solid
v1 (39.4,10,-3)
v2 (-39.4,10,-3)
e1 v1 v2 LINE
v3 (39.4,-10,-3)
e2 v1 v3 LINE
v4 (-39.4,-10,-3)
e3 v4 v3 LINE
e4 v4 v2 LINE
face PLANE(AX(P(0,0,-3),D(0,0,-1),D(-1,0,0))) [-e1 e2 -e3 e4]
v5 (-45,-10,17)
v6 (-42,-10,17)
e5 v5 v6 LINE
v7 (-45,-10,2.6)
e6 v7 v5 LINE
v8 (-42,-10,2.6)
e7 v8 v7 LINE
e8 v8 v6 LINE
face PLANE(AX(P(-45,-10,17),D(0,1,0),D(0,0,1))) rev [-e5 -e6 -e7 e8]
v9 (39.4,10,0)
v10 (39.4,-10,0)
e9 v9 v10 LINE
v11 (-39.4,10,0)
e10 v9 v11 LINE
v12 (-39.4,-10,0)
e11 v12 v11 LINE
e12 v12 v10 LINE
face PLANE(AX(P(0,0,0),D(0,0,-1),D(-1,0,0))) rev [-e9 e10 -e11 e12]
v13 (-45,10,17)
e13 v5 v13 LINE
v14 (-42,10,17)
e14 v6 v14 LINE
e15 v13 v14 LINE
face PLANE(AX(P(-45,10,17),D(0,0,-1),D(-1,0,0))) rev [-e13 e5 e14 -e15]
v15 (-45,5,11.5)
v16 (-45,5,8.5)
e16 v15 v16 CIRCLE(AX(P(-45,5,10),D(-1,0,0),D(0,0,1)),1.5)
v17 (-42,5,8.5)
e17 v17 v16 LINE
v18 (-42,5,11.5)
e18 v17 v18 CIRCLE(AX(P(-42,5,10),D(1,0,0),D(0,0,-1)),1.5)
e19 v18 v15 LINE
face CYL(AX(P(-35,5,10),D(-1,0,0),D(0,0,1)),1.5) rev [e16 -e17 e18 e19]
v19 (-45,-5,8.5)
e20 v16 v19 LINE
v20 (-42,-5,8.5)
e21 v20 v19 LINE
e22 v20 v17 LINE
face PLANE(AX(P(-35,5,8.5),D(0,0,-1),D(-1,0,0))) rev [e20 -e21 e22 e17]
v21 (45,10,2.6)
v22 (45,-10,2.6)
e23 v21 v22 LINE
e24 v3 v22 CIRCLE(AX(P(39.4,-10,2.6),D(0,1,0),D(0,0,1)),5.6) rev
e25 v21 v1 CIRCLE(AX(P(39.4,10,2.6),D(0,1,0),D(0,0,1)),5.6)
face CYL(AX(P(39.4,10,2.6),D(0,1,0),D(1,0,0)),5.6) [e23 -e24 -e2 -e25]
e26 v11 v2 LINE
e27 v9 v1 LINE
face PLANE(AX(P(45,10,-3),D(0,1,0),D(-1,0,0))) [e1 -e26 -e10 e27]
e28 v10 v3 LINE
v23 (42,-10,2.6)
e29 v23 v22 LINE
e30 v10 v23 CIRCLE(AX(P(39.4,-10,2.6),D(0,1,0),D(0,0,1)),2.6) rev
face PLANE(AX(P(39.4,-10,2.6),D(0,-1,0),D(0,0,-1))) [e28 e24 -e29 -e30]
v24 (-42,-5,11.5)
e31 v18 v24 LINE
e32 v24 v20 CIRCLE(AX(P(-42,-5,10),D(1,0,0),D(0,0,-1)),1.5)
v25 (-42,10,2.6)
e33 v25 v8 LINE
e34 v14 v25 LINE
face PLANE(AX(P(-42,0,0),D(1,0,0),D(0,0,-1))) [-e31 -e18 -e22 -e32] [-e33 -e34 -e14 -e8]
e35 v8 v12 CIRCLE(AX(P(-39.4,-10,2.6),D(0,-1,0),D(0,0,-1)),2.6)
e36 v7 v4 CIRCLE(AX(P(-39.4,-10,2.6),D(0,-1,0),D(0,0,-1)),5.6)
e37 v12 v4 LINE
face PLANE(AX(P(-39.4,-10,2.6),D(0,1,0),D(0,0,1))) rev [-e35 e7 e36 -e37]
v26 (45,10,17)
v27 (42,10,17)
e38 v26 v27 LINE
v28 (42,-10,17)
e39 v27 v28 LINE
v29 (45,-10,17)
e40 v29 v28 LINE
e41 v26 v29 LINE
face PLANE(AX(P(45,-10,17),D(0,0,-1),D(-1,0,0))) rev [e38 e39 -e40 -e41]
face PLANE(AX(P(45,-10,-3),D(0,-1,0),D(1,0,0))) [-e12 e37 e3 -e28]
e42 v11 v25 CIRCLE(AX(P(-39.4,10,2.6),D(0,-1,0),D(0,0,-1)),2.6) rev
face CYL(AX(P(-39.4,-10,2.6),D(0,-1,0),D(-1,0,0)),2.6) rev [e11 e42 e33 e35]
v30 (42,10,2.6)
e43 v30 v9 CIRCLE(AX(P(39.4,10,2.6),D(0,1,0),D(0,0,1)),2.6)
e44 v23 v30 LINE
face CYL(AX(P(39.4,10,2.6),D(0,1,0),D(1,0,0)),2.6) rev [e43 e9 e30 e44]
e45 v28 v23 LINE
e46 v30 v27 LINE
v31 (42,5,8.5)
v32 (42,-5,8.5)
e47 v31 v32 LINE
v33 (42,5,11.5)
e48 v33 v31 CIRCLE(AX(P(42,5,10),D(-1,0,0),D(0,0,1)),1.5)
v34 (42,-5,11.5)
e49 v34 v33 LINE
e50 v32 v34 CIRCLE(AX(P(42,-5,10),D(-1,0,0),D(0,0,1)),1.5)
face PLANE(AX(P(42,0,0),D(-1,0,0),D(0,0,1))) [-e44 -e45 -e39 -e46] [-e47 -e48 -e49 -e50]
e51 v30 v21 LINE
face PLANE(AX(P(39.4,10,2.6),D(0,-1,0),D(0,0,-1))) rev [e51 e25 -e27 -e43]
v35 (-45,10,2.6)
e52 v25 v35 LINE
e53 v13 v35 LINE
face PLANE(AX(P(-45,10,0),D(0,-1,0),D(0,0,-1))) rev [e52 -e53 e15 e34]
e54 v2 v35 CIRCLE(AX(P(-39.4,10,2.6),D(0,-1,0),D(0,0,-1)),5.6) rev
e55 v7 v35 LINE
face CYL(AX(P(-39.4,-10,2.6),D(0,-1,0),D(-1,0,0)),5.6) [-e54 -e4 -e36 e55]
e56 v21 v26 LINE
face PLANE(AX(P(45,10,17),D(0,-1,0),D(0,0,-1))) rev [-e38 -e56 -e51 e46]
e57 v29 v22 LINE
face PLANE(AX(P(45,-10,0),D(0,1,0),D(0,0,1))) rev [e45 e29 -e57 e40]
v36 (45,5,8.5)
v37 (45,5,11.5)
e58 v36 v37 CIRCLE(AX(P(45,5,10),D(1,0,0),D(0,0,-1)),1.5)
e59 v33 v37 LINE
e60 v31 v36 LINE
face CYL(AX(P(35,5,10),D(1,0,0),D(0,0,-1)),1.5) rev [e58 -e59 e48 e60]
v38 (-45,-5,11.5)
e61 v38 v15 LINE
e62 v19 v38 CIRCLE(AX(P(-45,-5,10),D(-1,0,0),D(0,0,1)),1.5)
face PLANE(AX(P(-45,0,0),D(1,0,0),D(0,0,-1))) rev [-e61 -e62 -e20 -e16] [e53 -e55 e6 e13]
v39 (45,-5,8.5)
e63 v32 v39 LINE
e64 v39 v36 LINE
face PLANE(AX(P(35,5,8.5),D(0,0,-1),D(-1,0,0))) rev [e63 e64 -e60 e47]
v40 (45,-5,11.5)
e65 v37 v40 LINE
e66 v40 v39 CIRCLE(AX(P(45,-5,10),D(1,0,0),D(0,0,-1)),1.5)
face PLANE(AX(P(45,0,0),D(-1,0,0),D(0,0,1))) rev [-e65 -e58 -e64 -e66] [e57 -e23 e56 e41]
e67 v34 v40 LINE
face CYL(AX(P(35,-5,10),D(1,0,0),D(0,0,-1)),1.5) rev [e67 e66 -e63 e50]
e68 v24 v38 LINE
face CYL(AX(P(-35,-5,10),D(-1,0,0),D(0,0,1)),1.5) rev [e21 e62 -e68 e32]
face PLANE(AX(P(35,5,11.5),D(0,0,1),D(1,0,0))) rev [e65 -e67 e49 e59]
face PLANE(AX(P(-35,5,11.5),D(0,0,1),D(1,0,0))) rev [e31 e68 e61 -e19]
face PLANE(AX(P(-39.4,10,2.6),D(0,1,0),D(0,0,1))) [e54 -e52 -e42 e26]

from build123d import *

# Parameters (mm, degrees)
SKETCH1_W                      = 90
SKETCH1_H                      = 20
BASE_FLANGE1_DEPTH             = 3
EDGE_FLANGE1_STRIP_W           = 17.2
EDGE_FLANGE1_STRIP_H           = 3
EDGE_FLANGE1_STRIP_CUT_DEPTH   = 20
EDGE_FLANGE1_STRIP_2_W         = 17.2
EDGE_FLANGE1_STRIP_2_H         = 3
EDGE_FLANGE1_STRIP_CUT_2_DEPTH = 20
EDGE_FLANGE1_DEPTH             = 20
EDGE_FLANGE1_BEND_DEPTH        = 20
CUT_EXTRUDE1_DEPTH             = 10
CUT_EXTRUDE2_START             = -10
CUT_EXTRUDE2_DEPTH             = 10


# Sheet-metal steps are written as plain solids
with BuildPart() as part:
    # Sketch1 → Base-Flange1 (new body)
    with BuildSketch(Plane.XY):
        Rectangle(SKETCH1_W, SKETCH1_H)
    extrude(amount=-BASE_FLANGE1_DEPTH)

    # Edge-Flange1 strip (across the edge) → Edge-Flange1 strip cut (cut)
    with BuildSketch(Plane(origin=(45, -10, 0), x_dir=(-1, 0, 0), z_dir=(0, 1, 0))):
        with Locations((-3, -1.5)):
            Rectangle(EDGE_FLANGE1_STRIP_W, EDGE_FLANGE1_STRIP_H)
    extrude(amount=EDGE_FLANGE1_STRIP_CUT_DEPTH, mode=Mode.SUBTRACT)

    # Edge-Flange1 strip 2 (across the edge) → Edge-Flange1 strip cut 2 (cut)
    with BuildSketch(Plane(origin=(-45, 10, 0), x_dir=(1, 0, 0), z_dir=(0, -1, 0))):
        with Locations((-3, -1.5)):
            Rectangle(EDGE_FLANGE1_STRIP_2_W, EDGE_FLANGE1_STRIP_2_H)
    extrude(amount=EDGE_FLANGE1_STRIP_CUT_2_DEPTH, mode=Mode.SUBTRACT)

    # Edge-Flange1 section (across the edge) → Edge-Flange1 (add)
    with BuildSketch(Plane(origin=(45, -10, 0), x_dir=(-1, 0, 0), z_dir=(0, 1, 0))):
        with BuildLine():
            Line((0, 2.6), (0, 17))
            Line((0, 17), (3, 17))
            Line((3, 17), (3, 2.6))
            ThreePointArc((3, 2.6), (3.761522369, 0.761522369), (5.6, 0))
            Line((5.6, 0), (5.6, -3))
            ThreePointArc((5.6, -3), (1.640202025, -1.359797975), (0, 2.6))
        make_face()
    extrude(amount=EDGE_FLANGE1_DEPTH)

    # Edge-Flange1 section 2 (across the edge) → Edge-Flange1 bend (add)
    with BuildSketch(Plane(origin=(-45, 10, 0), x_dir=(1, 0, 0), z_dir=(0, -1, 0))):
        with BuildLine():
            Line((0, 2.6), (0, 17))
            Line((0, 17), (3, 17))
            Line((3, 17), (3, 2.6))
            ThreePointArc((3, 2.6), (3.761522369, 0.761522369), (5.6, 0))
            Line((5.6, 0), (5.6, -3))
            ThreePointArc((5.6, -3), (1.640202025, -1.359797975), (0, 2.6))
        make_face()
    extrude(amount=EDGE_FLANGE1_BEND_DEPTH)

    # Sketch12 → Cut-Extrude1 (cut)
    with BuildSketch(Plane.ZY.offset(45)):
        with BuildLine():
            Line((11.5, 5), (11.5, -5))
            ThreePointArc((11.5, -5), (10, -6.5), (8.5, -5))
            Line((8.5, -5), (8.5, 5))
            ThreePointArc((8.5, 5), (10, 6.5), (11.5, 5))
        make_face()
    extrude(amount=-CUT_EXTRUDE1_DEPTH, mode=Mode.SUBTRACT)

    # Sketch13 → Cut-Extrude2 (cut)
    with BuildSketch(Plane(origin=(45, 0, 0), x_dir=(0, 0, -1), z_dir=(1, 0, 0)).offset(CUT_EXTRUDE2_START)):
        with BuildLine():
            Line((-8.5, 5), (-8.5, -5))
            ThreePointArc((-8.5, -5), (-10, -6.5), (-11.5, -5))
            Line((-11.5, -5), (-11.5, 5))
            ThreePointArc((-11.5, 5), (-10, 6.5), (-8.5, 5))
        make_face()
    extrude(amount=CUT_EXTRUDE2_DEPTH, mode=Mode.SUBTRACT)


solid = part.part
